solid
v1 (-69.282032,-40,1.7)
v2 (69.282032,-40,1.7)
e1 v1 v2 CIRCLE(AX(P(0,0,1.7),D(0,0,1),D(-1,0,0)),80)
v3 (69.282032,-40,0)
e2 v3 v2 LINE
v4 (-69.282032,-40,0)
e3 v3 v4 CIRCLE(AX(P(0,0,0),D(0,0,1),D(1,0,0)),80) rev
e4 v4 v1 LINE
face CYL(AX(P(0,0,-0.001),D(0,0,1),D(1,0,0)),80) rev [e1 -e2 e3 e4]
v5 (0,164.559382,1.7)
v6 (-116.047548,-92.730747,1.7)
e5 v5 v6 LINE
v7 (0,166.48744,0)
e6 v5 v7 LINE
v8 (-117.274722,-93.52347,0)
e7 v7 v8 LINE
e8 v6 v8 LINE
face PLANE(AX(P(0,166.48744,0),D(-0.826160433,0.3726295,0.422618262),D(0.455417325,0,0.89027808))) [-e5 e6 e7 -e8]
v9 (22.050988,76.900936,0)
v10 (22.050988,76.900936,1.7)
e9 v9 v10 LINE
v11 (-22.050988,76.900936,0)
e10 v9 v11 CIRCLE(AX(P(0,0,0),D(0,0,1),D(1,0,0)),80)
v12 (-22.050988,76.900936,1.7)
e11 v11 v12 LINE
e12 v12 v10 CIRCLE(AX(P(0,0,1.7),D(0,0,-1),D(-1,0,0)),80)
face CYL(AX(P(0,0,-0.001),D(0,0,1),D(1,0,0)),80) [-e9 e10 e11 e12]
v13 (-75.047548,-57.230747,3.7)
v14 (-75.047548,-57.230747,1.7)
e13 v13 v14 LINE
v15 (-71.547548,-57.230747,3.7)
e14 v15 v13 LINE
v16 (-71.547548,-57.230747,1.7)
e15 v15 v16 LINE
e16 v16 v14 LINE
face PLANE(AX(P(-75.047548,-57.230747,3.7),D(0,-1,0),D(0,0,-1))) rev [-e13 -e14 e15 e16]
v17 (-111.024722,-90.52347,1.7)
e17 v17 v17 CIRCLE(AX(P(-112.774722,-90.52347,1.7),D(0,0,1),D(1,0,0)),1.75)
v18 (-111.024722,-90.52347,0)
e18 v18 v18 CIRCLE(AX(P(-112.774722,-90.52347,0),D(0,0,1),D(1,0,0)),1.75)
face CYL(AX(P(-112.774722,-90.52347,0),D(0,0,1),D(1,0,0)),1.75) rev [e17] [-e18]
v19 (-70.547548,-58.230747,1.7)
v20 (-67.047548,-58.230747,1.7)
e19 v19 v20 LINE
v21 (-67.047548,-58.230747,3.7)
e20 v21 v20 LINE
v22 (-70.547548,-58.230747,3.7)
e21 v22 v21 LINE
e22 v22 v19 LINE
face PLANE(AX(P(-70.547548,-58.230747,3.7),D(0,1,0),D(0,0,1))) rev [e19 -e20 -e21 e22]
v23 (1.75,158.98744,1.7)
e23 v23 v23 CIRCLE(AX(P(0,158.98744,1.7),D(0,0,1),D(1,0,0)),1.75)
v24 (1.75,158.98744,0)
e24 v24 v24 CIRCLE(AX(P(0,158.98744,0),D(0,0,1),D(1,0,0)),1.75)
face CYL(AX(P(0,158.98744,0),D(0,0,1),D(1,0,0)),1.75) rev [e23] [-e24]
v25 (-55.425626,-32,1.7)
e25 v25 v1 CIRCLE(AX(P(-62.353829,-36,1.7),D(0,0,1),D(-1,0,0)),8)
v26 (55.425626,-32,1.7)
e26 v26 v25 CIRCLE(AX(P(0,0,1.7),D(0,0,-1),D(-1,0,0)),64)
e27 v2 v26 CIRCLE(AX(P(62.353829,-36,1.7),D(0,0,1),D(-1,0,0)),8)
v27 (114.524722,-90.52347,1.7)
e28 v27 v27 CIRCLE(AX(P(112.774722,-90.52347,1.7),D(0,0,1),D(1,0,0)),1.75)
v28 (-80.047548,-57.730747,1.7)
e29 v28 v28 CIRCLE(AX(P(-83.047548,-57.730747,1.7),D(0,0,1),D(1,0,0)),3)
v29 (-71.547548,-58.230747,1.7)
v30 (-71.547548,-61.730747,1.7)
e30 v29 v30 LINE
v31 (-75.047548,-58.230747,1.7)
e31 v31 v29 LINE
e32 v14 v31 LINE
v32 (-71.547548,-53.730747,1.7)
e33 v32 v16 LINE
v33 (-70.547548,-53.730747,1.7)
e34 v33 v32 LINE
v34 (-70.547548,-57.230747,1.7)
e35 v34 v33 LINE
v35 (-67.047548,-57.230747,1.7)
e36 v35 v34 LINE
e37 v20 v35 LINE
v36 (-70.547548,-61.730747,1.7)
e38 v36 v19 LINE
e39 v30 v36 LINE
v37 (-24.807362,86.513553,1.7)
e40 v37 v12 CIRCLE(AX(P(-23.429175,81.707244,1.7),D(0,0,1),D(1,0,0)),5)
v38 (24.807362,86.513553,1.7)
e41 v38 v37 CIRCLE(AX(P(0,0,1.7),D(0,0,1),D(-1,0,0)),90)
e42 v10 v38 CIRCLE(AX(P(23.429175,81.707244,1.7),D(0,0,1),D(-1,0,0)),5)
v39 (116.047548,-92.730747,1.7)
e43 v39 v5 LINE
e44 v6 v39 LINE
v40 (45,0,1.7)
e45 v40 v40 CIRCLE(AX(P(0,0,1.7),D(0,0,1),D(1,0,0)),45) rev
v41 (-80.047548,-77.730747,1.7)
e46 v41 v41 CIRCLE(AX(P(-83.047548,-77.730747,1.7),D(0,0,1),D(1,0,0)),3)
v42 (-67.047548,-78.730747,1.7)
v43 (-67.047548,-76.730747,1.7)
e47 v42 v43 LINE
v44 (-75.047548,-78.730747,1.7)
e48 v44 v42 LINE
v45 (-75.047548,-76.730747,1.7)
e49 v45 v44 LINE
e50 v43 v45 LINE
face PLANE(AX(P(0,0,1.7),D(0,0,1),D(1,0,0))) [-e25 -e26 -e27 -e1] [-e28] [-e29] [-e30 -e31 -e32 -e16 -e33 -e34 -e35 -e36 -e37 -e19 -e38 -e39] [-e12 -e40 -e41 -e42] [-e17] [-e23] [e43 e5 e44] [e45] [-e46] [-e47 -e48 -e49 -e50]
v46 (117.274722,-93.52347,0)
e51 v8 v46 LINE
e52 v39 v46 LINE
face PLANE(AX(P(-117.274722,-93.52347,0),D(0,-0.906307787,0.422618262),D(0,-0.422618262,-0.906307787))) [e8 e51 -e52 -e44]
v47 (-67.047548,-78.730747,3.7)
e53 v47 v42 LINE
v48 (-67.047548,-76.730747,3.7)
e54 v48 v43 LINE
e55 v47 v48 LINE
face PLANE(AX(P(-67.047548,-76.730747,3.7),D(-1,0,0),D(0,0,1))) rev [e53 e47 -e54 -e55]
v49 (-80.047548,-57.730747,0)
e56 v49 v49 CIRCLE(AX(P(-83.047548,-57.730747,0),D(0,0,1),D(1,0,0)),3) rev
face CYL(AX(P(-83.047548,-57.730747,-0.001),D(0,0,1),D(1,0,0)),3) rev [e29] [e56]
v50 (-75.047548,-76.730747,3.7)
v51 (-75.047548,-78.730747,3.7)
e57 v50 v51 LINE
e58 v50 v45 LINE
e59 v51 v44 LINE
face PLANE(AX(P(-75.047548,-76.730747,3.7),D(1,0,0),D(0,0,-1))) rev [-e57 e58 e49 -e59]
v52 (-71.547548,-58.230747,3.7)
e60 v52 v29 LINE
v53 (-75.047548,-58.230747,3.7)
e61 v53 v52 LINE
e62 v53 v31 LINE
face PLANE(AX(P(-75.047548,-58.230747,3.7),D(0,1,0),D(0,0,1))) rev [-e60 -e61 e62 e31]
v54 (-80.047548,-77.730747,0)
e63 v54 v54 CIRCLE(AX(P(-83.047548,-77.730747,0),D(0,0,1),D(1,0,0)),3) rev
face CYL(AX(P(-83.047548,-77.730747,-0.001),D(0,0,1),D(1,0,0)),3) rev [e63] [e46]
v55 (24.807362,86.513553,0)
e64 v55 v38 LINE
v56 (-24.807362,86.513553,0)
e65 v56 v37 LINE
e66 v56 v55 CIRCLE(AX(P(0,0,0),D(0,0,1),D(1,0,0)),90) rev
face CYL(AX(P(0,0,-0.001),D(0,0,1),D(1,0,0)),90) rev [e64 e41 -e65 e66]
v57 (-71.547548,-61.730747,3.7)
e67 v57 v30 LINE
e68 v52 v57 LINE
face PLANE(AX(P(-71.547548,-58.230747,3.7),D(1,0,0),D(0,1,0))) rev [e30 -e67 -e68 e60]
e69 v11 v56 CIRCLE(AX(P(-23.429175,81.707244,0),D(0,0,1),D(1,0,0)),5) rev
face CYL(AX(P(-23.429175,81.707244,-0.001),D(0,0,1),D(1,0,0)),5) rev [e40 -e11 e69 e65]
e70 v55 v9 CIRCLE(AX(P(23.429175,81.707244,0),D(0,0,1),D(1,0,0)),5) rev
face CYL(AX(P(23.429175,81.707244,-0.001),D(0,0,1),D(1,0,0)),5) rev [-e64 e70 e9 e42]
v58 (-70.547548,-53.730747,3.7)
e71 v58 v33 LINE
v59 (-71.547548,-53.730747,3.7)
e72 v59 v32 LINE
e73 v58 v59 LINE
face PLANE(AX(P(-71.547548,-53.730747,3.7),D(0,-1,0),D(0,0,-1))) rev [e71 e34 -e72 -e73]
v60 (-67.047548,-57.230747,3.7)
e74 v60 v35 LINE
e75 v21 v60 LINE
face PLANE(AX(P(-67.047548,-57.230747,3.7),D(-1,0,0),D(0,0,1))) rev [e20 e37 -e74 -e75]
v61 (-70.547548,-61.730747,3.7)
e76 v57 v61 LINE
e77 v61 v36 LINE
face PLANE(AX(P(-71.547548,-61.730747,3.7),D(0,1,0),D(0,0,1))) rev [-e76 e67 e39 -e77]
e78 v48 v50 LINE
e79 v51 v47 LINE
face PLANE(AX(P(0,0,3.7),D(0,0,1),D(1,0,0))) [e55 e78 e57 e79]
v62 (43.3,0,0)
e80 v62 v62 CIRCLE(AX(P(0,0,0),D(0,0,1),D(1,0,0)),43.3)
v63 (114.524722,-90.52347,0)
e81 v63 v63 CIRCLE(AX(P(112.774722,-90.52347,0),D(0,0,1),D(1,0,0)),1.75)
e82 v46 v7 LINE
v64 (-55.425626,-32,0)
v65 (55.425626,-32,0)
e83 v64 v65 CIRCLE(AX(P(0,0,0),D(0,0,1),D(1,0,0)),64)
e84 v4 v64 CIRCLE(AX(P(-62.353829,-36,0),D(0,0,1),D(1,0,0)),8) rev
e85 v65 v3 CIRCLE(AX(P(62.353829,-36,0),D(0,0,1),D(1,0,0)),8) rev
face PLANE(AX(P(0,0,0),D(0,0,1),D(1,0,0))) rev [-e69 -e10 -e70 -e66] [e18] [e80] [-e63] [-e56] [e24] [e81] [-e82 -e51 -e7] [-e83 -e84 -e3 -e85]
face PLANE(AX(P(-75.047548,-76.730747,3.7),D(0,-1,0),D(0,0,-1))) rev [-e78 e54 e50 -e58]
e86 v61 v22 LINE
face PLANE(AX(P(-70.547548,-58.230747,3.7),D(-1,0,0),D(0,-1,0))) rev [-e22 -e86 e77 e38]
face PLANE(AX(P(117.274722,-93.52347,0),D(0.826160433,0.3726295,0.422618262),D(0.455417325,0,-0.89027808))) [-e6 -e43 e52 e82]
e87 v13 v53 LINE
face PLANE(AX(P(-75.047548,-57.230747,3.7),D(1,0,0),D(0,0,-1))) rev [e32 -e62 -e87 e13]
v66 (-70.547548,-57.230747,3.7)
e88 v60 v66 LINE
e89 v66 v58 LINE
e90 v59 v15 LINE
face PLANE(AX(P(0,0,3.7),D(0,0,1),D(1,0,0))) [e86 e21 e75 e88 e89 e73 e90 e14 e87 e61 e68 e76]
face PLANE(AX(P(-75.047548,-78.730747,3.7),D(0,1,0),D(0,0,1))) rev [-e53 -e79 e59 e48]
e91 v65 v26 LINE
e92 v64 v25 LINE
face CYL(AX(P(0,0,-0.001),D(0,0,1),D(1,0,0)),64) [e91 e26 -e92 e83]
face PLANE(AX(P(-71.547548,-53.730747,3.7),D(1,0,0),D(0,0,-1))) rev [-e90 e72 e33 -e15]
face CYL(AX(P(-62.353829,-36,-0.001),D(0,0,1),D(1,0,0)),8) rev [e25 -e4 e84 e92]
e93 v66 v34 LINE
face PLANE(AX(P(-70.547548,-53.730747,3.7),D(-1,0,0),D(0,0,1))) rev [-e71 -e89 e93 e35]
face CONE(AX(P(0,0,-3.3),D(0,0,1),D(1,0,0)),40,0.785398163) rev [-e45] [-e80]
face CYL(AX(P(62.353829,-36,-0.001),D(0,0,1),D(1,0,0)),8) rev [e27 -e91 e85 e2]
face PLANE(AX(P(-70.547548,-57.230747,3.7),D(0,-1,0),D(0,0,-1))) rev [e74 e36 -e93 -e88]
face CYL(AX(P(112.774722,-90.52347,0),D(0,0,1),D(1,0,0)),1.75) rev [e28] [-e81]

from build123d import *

# Parameters (mm, degrees)
BOSS_EXTRUDE1_DEPTH = 1.7
BOSS_EXTRUDE1_TAPER = 25
SKETCH2_R           = 40
CUT_EXTRUDE1_DEPTH  = 204.652444278
SKETCH3_R           = 1.75
CUT_EXTRUDE2_DEPTH  = 204.652444278
CHAMFER1_SIZE       = 5
CUT_EXTRUDE4_REACH  = 205.652
SKETCH4_R           = 3
SKETCH6_W           = 8
SKETCH6_H           = 2
BOSS_EXTRUDE2_DEPTH = 2


with BuildPart() as part:
    # Sketch1 → Boss-Extrude1 (new body)
    with BuildSketch(Plane.XY):
        Polygon((117.27472237, -93.523470279), (0, 166.487439626), (-117.27472237, -93.523470279), align=None)
    extrude(amount=BOSS_EXTRUDE1_DEPTH, taper=BOSS_EXTRUDE1_TAPER)

    # Sketch2 → Cut-Extrude1 (cut, through all)
    with BuildSketch(Plane.XY.offset(1.7)):
        Circle(SKETCH2_R)
    extrude(amount=-CUT_EXTRUDE1_DEPTH, mode=Mode.SUBTRACT)

    # Sketch3 → Cut-Extrude2 (cut, through all)
    with BuildSketch(Plane.XY.offset(1.7)):
        with Locations((0, 158.987439626)):
            Circle(SKETCH3_R)
        with Locations((112.77472237, -90.523470279)):
            Circle(SKETCH3_R)
        with Locations((-112.77472237, -90.523470279)):
            Circle(SKETCH3_R)
    extrude(amount=-CUT_EXTRUDE2_DEPTH, mode=Mode.SUBTRACT)

    # Chamfer1
    # the kernel refuses this chamfer: 5 mm, written as the material it takes off along each edge
    with BuildSketch(Plane(origin=(0, 0, 1.7), x_dir=(1, 0, 0), z_dir=(0, -1, 0))) as chamfer1_piece_1:
        Polygon((40, -CHAMFER1_SIZE), (40 + CHAMFER1_SIZE, 0), (40, 0), align=None)
    revolve(axis=Axis((0, 0, 1.7), (0, 0, 1)), mode=Mode.SUBTRACT)

    # Sketch4 → Cut-Extrude4 (cut, up to next)
    with BuildSketch(Plane.XY.offset(1.7), mode=Mode.PRIVATE) as cut_extrude4_sk1:
        with Locations((-83.047547857, -57.73074726)):
            Circle(SKETCH4_R)
    cut_extrude4_tool1 = extrude(cut_extrude4_sk1.sketch, amount=-CUT_EXTRUDE4_REACH, mode=Mode.PRIVATE) & part.part
    # Sketch4 → Cut-Extrude4 (cut, up to next)
    with BuildSketch(Plane.XY.offset(1.7), mode=Mode.PRIVATE) as cut_extrude4_sk2:
        with Locations((-83.047547857, -77.73074726)):
            Circle(SKETCH4_R)
    cut_extrude4_tool2 = extrude(cut_extrude4_sk2.sketch, amount=-CUT_EXTRUDE4_REACH, mode=Mode.PRIVATE) & part.part
    # Sketch4 → Cut-Extrude4 (cut, up to next)
    with BuildSketch(Plane.XY.offset(1.7), mode=Mode.PRIVATE) as cut_extrude4_sk3:
        with BuildLine():
            ThreePointArc((69.282032303, -40), (0, -80), (-69.282032303, -40))
            ThreePointArc((-69.282032303, -40), (-66.353829072, -29.07179677), (-55.425625842, -32))
            ThreePointArc((-55.425625842, -32), (0, -64), (55.425625842, -32))
            ThreePointArc((55.425625842, -32), (66.353829072, -29.07179677), (69.282032303, -40))
        make_face()
    cut_extrude4_tool3 = extrude(cut_extrude4_sk3.sketch, amount=-CUT_EXTRUDE4_REACH, mode=Mode.PRIVATE) & part.part
    # Sketch4 → Cut-Extrude4 (cut, up to next)
    with BuildSketch(Plane.XY.offset(1.7), mode=Mode.PRIVATE) as cut_extrude4_sk4:
        with BuildLine():
            ThreePointArc((-24.807362024, 86.513552634), (0, 90), (24.807362024, 86.513552634))
            ThreePointArc((24.807362024, 86.513552634), (28.235483724, 80.329057376), (22.050988465, 76.900935675))
            ThreePointArc((22.050988465, 76.900935675), (0, 80), (-22.050988465, 76.900935675))
            ThreePointArc((-22.050988465, 76.900935675), (-28.235483724, 80.329057376), (-24.807362024, 86.513552634))
        make_face()
    cut_extrude4_tool4 = extrude(cut_extrude4_sk4.sketch, amount=-CUT_EXTRUDE4_REACH, mode=Mode.PRIVATE) & part.part
    add(cut_extrude4_tool1.solids().sort_by_distance((-83.047548, -57.730747, 1.7))[0], mode=Mode.SUBTRACT)
    add(cut_extrude4_tool2.solids().sort_by_distance((-83.047548, -77.730747, 1.7))[0], mode=Mode.SUBTRACT)
    add(cut_extrude4_tool3.solids().sort_by_distance((0, -78.499912, 1.7))[0], mode=Mode.SUBTRACT)
    add(cut_extrude4_tool4.solids().sort_by_distance((0, 83.588343, 1.7))[0], mode=Mode.SUBTRACT)

    # Sketch6 → Boss-Extrude2 (add)
    with BuildSketch(Plane.XY.offset(1.7)):
        Polygon((-71.547547857, -53.73074726), (-70.547547857, -53.73074726), (-70.547547857, -57.23074726), (-67.047547857, -57.23074726), (-67.047547857, -58.23074726), (-70.547547857, -58.23074726), (-70.547547857, -61.73074726), (-71.547547857, -61.73074726), (-71.547547857, -58.23074726), (-75.047547857, -58.23074726), (-75.047547857, -57.23074726), (-71.547547857, -57.23074726), align=None)
        with Locations((-71.047547857, -77.73074726)):
            Rectangle(SKETCH6_W, SKETCH6_H)
    extrude(amount=BOSS_EXTRUDE2_DEPTH)


solid = part.part
